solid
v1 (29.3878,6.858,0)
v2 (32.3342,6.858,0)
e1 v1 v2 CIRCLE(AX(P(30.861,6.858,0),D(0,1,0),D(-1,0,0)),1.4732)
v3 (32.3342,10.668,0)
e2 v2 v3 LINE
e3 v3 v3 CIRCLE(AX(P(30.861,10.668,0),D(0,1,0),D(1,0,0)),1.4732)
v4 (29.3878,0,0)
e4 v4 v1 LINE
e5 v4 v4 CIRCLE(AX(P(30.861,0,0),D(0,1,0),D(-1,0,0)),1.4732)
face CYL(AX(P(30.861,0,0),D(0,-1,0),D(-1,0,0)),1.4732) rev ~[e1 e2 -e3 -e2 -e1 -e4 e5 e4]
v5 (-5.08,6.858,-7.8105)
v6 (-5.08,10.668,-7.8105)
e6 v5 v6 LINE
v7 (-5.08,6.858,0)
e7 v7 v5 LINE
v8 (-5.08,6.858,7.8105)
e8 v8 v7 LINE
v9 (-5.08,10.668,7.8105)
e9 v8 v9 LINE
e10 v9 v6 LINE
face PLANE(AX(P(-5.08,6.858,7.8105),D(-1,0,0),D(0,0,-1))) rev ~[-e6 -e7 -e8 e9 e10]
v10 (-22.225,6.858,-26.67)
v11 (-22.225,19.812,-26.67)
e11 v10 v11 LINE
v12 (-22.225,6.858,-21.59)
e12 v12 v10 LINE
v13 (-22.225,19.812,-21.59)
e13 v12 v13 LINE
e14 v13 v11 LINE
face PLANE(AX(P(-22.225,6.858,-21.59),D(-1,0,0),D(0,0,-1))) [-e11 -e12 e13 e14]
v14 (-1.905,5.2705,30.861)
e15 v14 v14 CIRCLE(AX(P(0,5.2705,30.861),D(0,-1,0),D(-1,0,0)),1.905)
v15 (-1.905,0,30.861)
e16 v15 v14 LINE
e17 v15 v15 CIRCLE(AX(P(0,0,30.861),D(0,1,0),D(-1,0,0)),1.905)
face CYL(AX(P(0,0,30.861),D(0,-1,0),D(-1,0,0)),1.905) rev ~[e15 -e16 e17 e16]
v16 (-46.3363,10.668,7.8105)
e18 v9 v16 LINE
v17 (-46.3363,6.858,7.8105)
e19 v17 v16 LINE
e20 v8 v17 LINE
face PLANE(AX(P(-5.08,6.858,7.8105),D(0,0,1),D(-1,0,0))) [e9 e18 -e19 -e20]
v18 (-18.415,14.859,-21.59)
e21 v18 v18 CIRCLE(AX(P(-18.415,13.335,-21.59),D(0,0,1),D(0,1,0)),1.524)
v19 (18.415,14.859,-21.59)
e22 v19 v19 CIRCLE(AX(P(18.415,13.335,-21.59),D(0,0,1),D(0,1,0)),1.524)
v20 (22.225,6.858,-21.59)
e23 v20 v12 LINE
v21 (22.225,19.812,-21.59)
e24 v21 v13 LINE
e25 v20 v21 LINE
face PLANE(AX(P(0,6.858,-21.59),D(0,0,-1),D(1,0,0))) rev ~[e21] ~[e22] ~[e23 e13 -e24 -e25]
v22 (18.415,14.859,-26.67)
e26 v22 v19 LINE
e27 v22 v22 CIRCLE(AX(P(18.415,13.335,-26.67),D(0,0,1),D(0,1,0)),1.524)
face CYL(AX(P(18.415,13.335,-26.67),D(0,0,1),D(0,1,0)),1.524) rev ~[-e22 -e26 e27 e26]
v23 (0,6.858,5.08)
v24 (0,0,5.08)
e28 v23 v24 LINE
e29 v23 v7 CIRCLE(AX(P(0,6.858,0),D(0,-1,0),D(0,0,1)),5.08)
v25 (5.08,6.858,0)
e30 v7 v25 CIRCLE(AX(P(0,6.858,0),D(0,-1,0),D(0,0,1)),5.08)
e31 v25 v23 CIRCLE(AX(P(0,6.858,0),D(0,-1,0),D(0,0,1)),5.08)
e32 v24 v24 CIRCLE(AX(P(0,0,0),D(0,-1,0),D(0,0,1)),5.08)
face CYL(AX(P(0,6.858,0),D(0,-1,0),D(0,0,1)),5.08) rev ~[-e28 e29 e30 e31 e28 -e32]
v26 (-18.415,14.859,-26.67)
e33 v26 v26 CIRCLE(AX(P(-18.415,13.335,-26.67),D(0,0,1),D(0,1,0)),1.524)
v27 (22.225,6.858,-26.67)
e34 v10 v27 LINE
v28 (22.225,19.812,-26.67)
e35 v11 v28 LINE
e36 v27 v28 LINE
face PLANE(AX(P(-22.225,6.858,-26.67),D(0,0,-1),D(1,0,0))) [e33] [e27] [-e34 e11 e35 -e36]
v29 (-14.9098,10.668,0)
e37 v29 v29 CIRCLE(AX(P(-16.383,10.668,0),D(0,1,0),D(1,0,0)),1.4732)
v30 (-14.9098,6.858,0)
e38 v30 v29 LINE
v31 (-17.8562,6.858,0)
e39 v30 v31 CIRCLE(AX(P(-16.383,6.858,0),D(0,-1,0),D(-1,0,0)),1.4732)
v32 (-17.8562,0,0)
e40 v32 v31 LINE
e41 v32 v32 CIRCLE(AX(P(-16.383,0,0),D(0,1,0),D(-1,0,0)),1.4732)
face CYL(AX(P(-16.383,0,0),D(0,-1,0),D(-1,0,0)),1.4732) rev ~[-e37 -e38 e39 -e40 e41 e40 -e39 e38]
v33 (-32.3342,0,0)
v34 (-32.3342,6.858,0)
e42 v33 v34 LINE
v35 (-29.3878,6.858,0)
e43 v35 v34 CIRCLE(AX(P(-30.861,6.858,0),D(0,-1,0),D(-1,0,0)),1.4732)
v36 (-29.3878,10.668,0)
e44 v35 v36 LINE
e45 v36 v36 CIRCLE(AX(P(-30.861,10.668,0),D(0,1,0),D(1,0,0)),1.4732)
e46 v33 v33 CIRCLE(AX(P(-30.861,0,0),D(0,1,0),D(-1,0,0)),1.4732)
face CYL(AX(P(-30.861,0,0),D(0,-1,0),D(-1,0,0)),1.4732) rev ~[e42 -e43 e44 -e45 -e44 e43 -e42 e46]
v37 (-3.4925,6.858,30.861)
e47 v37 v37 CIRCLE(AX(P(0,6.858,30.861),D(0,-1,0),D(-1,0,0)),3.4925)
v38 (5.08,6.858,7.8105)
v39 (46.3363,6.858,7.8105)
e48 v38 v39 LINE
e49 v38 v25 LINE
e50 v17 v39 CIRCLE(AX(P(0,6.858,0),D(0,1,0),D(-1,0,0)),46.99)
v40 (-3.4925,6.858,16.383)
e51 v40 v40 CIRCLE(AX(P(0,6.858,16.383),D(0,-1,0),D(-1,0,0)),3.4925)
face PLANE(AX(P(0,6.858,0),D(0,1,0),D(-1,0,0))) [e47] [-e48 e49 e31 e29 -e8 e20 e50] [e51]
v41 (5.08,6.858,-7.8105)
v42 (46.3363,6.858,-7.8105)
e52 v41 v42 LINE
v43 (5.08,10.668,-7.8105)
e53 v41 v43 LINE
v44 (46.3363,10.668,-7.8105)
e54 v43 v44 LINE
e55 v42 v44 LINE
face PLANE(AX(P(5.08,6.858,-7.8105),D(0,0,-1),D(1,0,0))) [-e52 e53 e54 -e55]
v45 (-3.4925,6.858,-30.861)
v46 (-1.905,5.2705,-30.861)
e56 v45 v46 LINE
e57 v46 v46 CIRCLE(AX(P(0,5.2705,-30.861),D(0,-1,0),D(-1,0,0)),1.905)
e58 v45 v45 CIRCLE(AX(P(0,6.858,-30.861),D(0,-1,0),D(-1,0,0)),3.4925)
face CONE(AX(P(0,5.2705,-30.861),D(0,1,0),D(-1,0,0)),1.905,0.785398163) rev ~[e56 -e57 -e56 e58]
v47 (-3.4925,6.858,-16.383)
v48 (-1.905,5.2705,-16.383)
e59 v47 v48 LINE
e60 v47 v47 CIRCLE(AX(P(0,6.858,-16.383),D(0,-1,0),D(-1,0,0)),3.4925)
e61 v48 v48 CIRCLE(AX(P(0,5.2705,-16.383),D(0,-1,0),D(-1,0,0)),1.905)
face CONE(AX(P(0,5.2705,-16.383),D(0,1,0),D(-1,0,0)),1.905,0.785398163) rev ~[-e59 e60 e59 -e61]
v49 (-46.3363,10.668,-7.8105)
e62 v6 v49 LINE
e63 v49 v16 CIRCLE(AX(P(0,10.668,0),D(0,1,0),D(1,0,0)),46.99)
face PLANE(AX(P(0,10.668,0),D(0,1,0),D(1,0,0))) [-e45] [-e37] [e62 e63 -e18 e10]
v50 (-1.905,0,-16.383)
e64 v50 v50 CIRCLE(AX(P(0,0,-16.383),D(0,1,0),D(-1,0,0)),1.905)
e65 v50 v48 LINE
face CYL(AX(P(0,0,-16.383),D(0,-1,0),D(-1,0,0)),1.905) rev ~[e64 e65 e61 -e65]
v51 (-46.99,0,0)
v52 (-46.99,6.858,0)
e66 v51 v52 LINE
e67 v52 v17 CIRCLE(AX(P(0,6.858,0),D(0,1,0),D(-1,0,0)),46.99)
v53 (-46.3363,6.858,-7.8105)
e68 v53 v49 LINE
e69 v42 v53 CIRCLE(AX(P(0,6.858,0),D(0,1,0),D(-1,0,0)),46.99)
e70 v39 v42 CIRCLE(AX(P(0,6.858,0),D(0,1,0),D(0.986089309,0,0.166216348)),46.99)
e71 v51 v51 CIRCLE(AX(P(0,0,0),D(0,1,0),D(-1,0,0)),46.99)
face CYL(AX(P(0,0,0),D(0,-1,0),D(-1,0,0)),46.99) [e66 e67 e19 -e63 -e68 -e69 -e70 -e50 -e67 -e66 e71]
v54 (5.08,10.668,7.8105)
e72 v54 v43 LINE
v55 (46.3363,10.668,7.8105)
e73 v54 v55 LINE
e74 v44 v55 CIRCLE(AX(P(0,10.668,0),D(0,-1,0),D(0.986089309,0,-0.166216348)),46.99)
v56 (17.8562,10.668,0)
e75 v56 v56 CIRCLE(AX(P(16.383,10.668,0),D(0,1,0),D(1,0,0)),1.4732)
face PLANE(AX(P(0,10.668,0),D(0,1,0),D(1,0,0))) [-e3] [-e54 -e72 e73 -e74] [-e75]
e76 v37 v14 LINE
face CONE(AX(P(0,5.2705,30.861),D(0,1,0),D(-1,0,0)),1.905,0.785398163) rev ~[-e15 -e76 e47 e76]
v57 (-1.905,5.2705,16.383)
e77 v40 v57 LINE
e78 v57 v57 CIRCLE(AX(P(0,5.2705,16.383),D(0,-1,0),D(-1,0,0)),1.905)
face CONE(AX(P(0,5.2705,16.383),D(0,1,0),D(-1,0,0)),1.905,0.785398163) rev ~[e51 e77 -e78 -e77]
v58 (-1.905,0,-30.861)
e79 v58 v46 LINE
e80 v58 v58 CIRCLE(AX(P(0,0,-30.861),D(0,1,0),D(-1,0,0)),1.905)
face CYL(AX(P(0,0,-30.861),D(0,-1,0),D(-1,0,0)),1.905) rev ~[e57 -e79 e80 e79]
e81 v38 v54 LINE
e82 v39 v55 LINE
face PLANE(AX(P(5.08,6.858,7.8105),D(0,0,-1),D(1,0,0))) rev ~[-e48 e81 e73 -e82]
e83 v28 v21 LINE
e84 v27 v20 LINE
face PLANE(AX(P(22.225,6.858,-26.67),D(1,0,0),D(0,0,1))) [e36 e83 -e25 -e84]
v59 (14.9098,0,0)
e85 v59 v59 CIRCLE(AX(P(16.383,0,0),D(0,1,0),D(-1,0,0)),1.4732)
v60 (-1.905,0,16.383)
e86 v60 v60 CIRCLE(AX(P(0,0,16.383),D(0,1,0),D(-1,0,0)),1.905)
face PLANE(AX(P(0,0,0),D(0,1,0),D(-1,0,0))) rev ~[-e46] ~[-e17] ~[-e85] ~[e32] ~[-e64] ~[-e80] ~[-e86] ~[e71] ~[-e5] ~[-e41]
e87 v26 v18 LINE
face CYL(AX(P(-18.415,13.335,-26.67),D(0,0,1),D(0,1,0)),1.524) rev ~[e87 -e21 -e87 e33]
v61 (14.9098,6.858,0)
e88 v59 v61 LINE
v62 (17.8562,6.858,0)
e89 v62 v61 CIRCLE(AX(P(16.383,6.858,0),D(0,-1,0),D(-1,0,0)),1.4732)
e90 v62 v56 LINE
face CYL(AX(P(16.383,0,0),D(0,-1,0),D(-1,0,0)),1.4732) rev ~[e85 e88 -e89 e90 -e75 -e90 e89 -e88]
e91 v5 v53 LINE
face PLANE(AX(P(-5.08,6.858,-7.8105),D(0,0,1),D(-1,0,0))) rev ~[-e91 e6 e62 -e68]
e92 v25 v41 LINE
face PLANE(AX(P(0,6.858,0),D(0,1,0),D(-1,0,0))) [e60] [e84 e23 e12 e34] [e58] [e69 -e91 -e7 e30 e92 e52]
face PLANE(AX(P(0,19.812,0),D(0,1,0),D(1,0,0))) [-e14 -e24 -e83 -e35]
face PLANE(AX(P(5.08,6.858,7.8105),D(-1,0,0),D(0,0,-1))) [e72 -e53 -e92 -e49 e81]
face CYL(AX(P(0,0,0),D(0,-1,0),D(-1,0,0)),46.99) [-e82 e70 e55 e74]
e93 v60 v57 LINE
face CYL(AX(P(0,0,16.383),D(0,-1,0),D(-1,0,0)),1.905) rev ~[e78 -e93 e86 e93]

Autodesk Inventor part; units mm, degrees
ref_plane "YZ Plane" through (0, 0, 0) normal (1, 0, 0) x (0, 1, 0)
ref_plane "XZ Plane" through (0, 0, 0) normal (0, 1, 0) x (-1, 0, 0)
ref_plane "XY Plane" through (0, 0, 0) normal (0, 0, 1) x (1, 0, 0)
sketch "Sketch1" plane through (0, 0, 0) normal (0, 1, 0) x (-1, 0, 0)
  circle A0 centre (0, 0) radius 46.99
  line L0 (0, 0) -> (16.383, 0)
  line L1 (16.383, 0) -> (30.861, 0)
  line L2 (0, 0) -> (0, -16.383)
  line L3 (0, -16.383) -> (0, -30.861)
  line L4 (0, 0) -> (0, 16.383)
  line L5 (0, 16.383) -> (0, 30.861)
  line L6 (0, 0) -> (-16.383, 0)
  line L7 (-16.383, 0) -> (-30.861, 0)
  circle A1 centre (0, 30.861) radius 1.905
  circle A2 centre (30.861, 0) radius 1.4732
  circle A3 centre (0, -30.861) radius 1.905
  circle A4 centre (-30.861, 0) radius 1.4732
  circle A5 centre (-16.383, 0) radius 1.4732
  circle A6 centre (0, 16.383) radius 1.905
  circle A7 centre (16.383, 0) radius 1.4732
  circle A8 centre (0, -16.383) radius 1.905
  dimension "d0" = 93.98
  dimension "d1" = 16.383
  dimension "d2" = 14.478
  dimension "d3" = 16.383
  dimension "d4" = 14.478
  dimension "d5" = 16.383
  dimension "d6" = 14.478
  dimension "d7" = 16.383
  dimension "d8" = 14.478
  dimension "d9" = 3.81
  dimension "d10" = 2.9464
  dimension "d11" = 3.81
  dimension "d12" = 2.9464
  dimension "d13" = 2.9464
  dimension "d14" = 3.81
  dimension "d15" = 2.9464
  dimension "d16" = 3.81
extrude "Extrusion1" add sketch "Sketch1" along normal blind 6.858
sketch "Sketch2" plane through (0, 6.858, 0) normal (0, 1, 0) x (1, 0, 0)
  circle A0 centre (0, 0) radius 46.99 projected
hole "Hole1" at (0, 6.858, 0) direction (0, -1, 0) diameter 10.16 depth 25.4 tip angle 118
sketch "Sketch3" plane through (0, 6.858, 0) normal (0, 1, 0) x (1, 0, 0)
  circle A0 centre (-16.383, 0) radius 1.4732 projected
  circle A1 centre (16.383, 0) radius 1.4732 projected
  circle A2 centre (30.861, 0) radius 1.4732 projected
  circle A3 centre (-30.861, 0) radius 1.4732 projected
  circle A4 centre (0, 0) radius 46.99 projected
  line L0 (0, 0) -> (0, 7.8105)
  line L1 (0, 0) -> (0, -7.8105)
  line L2 (0, -7.8105) -> (46.3363, -7.8105)
  line L3 (0, 7.8105) -> (46.3363, 7.8105)
  line L4 (0, 7.8105) -> (-46.3363, 7.8105)
  line L5 (0, -7.8105) -> (-46.3363, -7.8105)
  line L6 (-5.08, -7.8105) -> (-5.08, 7.8105)
  line L7 (5.08, -7.8105) -> (5.08, 7.8105)
  dimension "d26" = 7.8105
  dimension "d27" = 7.8105
extrude "Extrusion2" add sketch "Sketch3" along normal blind 3.81 contours A4 L2 L7 L3 | L4 L6 L5 A4
chamfer "Chamfer1" distance 1.5875 angle 45 1 edges at (1.905, 6.858, 30.861)
chamfer "Chamfer2" distance 1.5875 angle 45 3 edges at (1.905, 6.858, 16.383) (1.905, 6.858, -16.383) (1.905, 6.858, -30.861)
sketch "Sketch4" plane through (0, 6.858, 0) normal (0, 1, 0) x (1, 0, 0)
  line L0 (0, 21.59) -> (22.225, 21.59)
  line L1 (0, 21.59) -> (-22.225, 21.59)
  line L2 (-22.225, 21.59) -> (-22.225, 26.67)
  line L3 (-22.225, 26.67) -> (22.225, 26.67)
  line L4 (22.225, 26.67) -> (22.225, 21.59)
  dimension "d37" = 22.225
  dimension "d38" = 22.225
  dimension "d39" = 5.08
extrude "Extrusion3" add sketch "Sketch4" along normal blind 12.954
sketch "Sketch5" plane through (22.225, 6.858, -26.67) normal (0, 0, -1) x (-1, 0, 0)
  line L0 (44.45, 0) -> (44.45, 12.954) projected
  line L1 (0, 0) -> (0, 12.954) projected
  line L2 (0, 6.477) -> (44.45, 6.477)
  line L3 (44.45, 6.477) -> (40.64, 6.477)
  line L4 (0, 6.477) -> (3.81, 6.477)
  circle A0 centre (3.81, 6.477) radius 1.524
  circle A1 centre (40.64, 6.477) radius 1.524
  point P0 (22.225, -6.858)
  dimension "d42" = 3.81
  dimension "d43" = 3.81
  dimension "d44" = 3.048
  dimension "d45" = 3.048
hole "Hole2" at (18.415, 13.335, -26.67) at (-18.415, 13.335, -26.67) direction (0, 0, 1) diameter 3.048 depth 25.4 tip angle 118
properties part number "Master Tablet and IR Mount"
